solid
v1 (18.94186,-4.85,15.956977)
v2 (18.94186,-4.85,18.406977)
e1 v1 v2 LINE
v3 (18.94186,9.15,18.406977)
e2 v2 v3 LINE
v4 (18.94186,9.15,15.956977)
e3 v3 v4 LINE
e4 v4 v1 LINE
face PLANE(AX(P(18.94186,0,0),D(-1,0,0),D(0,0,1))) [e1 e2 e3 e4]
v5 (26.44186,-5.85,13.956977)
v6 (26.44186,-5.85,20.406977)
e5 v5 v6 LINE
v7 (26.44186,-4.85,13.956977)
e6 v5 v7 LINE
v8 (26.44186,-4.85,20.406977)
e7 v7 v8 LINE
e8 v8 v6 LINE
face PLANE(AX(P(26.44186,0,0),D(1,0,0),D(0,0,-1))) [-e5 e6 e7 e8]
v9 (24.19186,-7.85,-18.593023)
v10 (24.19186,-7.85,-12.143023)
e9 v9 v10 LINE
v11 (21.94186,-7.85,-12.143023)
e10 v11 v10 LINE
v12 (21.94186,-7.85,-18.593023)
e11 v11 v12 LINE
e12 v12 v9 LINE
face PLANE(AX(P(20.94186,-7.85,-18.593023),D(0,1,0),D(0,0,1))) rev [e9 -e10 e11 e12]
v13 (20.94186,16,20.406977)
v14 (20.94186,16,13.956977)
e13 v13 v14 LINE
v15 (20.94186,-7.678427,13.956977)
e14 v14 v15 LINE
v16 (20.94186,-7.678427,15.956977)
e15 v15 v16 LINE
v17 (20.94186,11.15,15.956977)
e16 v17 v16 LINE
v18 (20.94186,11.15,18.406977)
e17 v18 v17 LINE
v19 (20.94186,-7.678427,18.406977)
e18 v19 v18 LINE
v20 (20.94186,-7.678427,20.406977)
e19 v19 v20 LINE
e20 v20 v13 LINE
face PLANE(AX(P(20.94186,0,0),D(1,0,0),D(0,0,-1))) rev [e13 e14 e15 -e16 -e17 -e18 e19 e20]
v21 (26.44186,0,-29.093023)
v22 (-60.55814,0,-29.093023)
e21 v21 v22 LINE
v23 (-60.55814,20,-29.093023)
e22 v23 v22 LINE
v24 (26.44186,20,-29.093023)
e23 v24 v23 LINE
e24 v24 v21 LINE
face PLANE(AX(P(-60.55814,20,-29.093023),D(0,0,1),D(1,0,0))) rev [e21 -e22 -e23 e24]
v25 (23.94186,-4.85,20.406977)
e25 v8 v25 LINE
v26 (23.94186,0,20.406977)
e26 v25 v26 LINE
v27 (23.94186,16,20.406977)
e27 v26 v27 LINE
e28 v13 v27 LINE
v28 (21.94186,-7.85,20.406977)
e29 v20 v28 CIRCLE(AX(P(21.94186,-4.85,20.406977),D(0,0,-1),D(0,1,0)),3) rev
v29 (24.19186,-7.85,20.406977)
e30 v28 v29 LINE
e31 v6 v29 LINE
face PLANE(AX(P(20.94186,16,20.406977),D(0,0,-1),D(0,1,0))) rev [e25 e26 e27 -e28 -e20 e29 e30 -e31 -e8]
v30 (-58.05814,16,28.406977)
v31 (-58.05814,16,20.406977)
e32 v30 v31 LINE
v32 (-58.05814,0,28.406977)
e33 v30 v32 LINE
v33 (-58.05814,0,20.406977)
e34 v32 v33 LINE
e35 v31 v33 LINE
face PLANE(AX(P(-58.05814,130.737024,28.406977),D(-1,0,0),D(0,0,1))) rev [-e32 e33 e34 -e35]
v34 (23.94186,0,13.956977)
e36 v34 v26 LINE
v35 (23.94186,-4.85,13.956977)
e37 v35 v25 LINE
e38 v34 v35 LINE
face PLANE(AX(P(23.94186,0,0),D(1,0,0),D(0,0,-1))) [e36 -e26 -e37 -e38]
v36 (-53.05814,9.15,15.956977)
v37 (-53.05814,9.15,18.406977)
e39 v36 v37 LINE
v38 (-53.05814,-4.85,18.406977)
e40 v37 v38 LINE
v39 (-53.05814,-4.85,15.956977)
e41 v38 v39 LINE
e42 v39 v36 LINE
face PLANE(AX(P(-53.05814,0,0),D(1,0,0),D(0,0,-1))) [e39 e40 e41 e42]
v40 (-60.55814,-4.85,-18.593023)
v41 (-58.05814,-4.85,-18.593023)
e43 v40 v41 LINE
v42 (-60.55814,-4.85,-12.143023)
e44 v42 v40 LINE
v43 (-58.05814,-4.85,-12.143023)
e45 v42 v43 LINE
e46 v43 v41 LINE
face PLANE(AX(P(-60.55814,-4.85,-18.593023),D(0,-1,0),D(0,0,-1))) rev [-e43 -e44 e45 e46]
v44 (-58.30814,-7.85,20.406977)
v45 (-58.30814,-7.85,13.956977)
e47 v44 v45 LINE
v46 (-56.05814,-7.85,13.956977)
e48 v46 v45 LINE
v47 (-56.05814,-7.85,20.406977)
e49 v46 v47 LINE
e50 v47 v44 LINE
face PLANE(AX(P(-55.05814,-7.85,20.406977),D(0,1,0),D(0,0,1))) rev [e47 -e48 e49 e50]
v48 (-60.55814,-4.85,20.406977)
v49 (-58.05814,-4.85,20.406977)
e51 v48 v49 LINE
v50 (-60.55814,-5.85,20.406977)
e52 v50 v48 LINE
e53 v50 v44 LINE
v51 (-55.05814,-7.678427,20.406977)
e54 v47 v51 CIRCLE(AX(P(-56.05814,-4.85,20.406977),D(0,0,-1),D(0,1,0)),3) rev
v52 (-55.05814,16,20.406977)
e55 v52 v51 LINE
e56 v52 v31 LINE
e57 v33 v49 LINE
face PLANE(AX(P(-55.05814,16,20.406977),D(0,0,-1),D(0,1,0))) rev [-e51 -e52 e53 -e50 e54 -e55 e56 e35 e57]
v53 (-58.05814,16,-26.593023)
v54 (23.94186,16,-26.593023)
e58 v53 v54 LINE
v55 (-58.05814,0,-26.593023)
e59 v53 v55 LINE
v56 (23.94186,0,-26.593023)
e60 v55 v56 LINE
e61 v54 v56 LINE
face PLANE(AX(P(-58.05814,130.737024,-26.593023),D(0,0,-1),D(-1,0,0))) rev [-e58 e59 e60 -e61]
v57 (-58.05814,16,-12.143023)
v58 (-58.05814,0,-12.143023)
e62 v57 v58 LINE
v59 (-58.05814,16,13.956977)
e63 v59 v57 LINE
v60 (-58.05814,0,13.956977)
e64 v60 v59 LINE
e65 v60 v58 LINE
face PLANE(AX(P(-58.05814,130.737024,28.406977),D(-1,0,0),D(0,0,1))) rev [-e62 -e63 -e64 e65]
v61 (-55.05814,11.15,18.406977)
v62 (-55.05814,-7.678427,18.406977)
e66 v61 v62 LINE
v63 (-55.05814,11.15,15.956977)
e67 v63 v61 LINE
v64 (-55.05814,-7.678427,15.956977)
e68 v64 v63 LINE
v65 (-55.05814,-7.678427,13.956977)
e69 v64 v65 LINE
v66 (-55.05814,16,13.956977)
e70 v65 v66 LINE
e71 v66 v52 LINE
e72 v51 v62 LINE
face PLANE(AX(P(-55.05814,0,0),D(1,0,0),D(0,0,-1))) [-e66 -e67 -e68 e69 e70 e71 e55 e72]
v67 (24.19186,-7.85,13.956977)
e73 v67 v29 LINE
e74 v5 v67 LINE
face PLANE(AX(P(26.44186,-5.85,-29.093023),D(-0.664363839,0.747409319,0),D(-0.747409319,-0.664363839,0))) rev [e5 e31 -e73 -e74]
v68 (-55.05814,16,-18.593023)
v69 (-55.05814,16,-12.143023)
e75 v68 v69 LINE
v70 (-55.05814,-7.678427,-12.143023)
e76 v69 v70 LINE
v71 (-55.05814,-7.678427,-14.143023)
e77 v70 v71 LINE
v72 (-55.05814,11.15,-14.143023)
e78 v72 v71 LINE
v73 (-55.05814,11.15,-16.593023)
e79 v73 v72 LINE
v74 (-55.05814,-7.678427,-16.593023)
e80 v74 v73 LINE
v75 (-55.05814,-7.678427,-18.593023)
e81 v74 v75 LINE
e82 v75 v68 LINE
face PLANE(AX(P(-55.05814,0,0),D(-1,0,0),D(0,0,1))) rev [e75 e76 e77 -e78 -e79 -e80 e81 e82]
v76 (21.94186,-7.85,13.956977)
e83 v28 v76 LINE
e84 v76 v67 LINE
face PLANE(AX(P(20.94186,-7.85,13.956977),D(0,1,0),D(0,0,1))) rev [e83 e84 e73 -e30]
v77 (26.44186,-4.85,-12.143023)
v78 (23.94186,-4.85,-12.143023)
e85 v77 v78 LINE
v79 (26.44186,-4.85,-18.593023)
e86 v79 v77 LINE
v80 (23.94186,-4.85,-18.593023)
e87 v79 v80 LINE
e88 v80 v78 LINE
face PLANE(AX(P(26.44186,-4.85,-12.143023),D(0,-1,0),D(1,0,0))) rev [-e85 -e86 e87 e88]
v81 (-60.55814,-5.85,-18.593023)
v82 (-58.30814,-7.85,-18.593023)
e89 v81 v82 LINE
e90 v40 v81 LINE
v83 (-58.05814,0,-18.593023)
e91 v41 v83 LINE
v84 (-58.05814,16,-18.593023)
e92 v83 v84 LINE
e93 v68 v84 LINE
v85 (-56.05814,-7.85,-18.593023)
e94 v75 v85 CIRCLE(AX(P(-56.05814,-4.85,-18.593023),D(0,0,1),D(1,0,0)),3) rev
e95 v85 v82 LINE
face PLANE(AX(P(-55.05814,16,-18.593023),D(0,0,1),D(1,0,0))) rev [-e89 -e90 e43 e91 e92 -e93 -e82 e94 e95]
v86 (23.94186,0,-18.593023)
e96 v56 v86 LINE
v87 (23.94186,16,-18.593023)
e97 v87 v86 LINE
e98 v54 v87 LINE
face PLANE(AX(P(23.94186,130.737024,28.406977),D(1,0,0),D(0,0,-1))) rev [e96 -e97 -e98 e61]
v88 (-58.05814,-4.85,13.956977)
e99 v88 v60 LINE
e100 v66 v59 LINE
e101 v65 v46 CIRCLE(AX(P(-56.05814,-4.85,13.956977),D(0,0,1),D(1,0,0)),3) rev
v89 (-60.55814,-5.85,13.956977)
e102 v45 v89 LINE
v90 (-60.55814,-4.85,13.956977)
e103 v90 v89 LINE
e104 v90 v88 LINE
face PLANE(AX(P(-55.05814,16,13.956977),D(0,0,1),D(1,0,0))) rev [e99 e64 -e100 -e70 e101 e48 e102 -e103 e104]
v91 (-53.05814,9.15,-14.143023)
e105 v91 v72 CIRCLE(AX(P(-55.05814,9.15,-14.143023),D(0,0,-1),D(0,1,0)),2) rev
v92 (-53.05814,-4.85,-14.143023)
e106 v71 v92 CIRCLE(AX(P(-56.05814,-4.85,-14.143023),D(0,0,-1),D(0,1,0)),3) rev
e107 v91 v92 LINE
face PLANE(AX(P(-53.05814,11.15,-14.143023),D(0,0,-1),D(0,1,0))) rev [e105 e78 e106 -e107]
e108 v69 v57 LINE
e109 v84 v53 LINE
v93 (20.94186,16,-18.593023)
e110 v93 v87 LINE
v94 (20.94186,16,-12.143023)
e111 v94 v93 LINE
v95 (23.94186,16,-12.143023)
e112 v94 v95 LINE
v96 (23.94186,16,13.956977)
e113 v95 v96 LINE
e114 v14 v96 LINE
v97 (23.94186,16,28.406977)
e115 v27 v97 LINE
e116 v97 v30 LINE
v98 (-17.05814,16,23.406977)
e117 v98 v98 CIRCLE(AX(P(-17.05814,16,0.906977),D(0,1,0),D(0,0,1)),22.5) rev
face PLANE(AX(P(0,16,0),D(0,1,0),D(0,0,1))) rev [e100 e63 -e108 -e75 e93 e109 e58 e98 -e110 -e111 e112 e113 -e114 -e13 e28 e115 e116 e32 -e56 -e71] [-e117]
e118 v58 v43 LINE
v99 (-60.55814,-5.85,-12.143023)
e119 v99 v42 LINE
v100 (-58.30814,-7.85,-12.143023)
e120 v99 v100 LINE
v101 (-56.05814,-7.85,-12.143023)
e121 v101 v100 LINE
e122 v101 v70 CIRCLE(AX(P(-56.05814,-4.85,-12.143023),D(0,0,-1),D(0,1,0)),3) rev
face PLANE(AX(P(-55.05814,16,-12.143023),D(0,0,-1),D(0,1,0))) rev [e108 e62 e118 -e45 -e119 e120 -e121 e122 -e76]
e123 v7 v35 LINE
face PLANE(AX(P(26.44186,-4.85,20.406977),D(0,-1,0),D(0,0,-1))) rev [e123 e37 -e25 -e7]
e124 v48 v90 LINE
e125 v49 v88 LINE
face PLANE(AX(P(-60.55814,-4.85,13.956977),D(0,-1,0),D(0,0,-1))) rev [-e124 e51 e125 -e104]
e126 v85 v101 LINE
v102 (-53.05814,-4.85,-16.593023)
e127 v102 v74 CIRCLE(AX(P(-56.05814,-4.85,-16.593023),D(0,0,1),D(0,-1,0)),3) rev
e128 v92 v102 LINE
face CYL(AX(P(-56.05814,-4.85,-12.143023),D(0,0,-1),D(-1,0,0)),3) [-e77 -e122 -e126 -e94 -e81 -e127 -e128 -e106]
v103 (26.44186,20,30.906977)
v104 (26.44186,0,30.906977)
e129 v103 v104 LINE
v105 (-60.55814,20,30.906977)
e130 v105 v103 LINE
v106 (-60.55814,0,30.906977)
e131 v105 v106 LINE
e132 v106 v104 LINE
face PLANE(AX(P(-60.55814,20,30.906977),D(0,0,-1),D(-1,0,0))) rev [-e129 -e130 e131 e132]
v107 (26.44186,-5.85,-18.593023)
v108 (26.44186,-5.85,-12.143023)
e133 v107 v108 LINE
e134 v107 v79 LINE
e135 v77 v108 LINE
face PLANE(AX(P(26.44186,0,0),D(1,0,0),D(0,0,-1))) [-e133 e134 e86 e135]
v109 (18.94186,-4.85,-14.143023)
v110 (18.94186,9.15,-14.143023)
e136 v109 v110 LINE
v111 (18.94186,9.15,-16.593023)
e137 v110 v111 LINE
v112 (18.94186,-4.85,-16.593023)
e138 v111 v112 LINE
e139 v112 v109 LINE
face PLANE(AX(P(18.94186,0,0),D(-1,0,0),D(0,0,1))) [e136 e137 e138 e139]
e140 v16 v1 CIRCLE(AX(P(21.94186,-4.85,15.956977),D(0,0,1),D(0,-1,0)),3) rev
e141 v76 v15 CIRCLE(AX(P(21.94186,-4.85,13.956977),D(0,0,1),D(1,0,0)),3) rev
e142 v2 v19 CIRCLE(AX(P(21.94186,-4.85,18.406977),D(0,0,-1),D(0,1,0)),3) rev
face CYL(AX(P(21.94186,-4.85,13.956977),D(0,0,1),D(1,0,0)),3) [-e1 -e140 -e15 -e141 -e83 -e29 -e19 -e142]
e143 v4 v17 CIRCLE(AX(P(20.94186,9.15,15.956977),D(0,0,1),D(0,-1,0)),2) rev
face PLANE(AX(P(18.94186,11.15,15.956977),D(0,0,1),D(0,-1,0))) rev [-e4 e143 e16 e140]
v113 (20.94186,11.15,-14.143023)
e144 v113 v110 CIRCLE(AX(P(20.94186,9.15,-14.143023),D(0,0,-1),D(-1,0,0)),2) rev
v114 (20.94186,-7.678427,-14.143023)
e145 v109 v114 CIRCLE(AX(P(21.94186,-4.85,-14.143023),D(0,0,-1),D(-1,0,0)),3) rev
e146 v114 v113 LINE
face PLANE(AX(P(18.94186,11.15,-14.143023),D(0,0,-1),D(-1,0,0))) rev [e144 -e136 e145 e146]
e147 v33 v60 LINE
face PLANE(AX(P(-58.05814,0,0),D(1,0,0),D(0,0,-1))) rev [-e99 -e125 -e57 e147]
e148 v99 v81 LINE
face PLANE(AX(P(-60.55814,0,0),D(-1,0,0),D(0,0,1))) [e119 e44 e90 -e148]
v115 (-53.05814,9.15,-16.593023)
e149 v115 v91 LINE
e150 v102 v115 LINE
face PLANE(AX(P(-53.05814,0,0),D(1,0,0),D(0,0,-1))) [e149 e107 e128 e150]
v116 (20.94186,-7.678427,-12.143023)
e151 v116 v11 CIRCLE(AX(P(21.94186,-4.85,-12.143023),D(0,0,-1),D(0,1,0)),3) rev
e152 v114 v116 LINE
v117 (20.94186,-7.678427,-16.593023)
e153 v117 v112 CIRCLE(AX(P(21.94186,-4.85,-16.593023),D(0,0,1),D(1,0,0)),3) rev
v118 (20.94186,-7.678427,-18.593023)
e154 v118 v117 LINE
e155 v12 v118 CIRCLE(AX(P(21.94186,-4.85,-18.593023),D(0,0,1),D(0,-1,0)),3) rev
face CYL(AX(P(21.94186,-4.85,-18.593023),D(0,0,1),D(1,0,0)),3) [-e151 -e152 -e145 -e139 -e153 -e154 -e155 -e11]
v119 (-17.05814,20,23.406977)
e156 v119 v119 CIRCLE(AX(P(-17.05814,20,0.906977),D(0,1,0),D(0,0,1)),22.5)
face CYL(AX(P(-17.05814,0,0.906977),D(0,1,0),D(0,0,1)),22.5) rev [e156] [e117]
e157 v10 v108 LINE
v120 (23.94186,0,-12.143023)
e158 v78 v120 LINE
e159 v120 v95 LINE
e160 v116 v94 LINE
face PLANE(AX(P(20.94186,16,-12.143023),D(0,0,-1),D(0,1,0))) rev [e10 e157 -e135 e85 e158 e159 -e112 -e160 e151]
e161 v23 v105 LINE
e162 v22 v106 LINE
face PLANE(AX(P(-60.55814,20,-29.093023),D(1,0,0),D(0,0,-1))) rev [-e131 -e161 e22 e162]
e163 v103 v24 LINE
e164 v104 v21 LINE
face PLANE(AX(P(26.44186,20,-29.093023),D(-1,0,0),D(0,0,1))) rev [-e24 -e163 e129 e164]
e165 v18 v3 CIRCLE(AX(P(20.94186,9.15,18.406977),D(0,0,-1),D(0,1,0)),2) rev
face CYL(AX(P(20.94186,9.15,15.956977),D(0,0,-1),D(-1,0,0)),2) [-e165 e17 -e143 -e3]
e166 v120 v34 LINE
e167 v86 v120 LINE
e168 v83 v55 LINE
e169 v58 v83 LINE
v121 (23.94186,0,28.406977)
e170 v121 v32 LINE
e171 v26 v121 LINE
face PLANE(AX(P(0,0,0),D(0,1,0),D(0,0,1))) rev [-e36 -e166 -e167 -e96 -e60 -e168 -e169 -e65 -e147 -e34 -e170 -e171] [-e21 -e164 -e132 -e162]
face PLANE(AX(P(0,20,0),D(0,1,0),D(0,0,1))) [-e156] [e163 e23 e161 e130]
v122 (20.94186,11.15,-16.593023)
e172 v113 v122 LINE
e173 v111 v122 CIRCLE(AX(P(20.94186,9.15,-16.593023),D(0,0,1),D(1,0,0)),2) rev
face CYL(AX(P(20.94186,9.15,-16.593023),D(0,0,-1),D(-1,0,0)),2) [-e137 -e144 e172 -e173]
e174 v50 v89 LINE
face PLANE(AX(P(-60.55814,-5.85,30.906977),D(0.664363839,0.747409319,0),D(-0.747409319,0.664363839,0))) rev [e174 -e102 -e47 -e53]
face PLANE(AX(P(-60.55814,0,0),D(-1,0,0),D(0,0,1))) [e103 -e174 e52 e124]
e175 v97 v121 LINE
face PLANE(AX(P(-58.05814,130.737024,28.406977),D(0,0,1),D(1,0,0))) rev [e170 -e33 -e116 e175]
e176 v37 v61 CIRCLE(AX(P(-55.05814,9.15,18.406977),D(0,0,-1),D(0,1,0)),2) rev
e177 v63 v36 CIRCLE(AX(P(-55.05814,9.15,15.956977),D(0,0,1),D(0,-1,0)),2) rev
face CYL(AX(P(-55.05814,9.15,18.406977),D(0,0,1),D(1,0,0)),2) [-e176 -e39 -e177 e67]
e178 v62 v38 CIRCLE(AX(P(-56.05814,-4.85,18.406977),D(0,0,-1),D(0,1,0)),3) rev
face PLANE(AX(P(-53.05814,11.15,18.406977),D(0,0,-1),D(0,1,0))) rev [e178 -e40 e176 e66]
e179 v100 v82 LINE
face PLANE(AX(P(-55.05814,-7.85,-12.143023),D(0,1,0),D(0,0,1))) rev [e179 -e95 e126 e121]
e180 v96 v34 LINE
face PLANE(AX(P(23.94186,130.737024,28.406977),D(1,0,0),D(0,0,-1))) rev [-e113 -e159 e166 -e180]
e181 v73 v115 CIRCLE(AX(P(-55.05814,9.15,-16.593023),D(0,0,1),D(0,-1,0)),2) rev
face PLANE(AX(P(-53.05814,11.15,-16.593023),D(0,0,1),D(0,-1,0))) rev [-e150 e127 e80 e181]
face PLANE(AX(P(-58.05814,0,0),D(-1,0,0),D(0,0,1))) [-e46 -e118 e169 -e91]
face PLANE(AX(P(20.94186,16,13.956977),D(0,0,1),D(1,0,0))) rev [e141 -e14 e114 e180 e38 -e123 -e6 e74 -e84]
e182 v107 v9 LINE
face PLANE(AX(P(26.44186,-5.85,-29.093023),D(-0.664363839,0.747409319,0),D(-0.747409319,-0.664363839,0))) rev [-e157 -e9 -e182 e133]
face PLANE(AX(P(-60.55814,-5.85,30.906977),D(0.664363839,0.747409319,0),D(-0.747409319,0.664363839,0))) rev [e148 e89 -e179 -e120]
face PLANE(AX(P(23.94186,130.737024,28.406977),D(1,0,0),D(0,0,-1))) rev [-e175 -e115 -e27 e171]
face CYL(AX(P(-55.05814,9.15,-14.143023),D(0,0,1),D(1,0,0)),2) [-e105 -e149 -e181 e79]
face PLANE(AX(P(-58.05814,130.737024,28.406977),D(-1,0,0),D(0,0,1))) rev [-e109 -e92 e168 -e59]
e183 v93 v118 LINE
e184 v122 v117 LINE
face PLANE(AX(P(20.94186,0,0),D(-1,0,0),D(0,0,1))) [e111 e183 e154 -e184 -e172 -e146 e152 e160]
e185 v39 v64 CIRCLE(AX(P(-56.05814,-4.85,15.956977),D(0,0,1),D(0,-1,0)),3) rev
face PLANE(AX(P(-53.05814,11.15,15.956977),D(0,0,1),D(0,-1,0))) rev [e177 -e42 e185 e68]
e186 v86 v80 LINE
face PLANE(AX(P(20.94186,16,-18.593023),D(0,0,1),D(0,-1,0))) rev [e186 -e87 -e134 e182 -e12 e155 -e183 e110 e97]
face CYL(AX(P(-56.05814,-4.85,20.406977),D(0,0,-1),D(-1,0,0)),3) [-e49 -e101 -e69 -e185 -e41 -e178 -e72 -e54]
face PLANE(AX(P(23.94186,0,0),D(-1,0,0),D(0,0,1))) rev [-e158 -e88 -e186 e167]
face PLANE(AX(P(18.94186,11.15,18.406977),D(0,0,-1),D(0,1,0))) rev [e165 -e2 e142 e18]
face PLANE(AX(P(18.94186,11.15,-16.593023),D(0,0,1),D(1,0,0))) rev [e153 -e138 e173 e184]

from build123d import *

# Parameters (mm, degrees)
SKETCH1_W            = 87
SKETCH1_H            = 60
BOSS_EXTRUDE1_DEPTH  = 20
SKETCH2_R            = 22.5
CUT_EXTRUDE1_DEPTH   = 20
SKETCH3_W            = 82
SKETCH3_H            = 55
CUT_EXTRUDE2_DEPTH   = 16
SKETCH4_W            = 6.45
SKETCH4_H            = 23.85
BOSS_EXTRUDE2_DEPTH  = 3
SKETCH5_W            = 2.45
SKETCH5_H            = 19
BOSS_EXTRUDE3_DEPTH  = 2
FILLET5_R            = 3
FILLET7_R            = 2
SKETCH6_W            = 2.45
SKETCH6_H            = 19
BOSS_EXTRUDE4_DEPTH  = 2
FILLET8_R            = 3
FILLET9_R            = 2
SKETCH7_W            = 6.45
SKETCH7_H            = 3
BOSS_EXTRUDE5_DEPTH  = 2.5
SKETCH9_W            = 6.45
SKETCH9_H            = 3
BOSS_EXTRUDE6_DEPTH  = 2.5
CUT_EXTRUDE3_DEPTH   = 81.731271908
SKETCH46_W           = 6.45
SKETCH46_H           = 23.85
BOSS_EXTRUDE22_DEPTH = 3
SKETCH47_W           = 2.45
SKETCH47_H           = 19
BOSS_EXTRUDE23_DEPTH = 2
SKETCH48_W           = 2.45
SKETCH48_H           = 19
BOSS_EXTRUDE24_DEPTH = 2
FILLET11_R           = 3
FILLET12_R           = 3
FILLET13_R           = 2
FILLET14_R           = 2
SKETCH49_W           = 6.45
SKETCH49_H           = 3
BOSS_EXTRUDE25_DEPTH = 2.5
SKETCH50_W           = 6.45
SKETCH50_H           = 3
BOSS_EXTRUDE26_DEPTH = 2.5
CUT_EXTRUDE8_DEPTH   = 81.731271908


with BuildPart() as part:
    # Sketch1 → Boss-Extrude1 (new body)
    with BuildSketch(Plane(origin=(0, 0, 0), x_dir=(1, 0, 0), z_dir=(0, 1, 0))):
        with Locations((-17.058139535, -0.906976744)):
            Rectangle(SKETCH1_W, SKETCH1_H)
    extrude(amount=BOSS_EXTRUDE1_DEPTH)

    # Sketch2 → Cut-Extrude1 (cut)
    with BuildSketch(Plane(origin=(0, 20, 0), x_dir=(1, 0, 0), z_dir=(0, 1, 0))):
        with Locations(Location((-17.058139535, -0.906976744, 0), (0, 0, 270))):
            Circle(SKETCH2_R)
    extrude(amount=-CUT_EXTRUDE1_DEPTH, mode=Mode.SUBTRACT)

    # Sketch3 → Cut-Extrude2 (cut)
    with BuildSketch(Plane.XZ):
        with Locations((-17.058139535, 0.906976744)):
            Rectangle(SKETCH3_W, SKETCH3_H)
    extrude(amount=-CUT_EXTRUDE2_DEPTH, mode=Mode.SUBTRACT)

    # Sketch4 → Boss-Extrude2 (add)
    with BuildSketch(Plane.ZY.offset(-23.941860465)):
        with Locations((-15.368023256, 4.075)):
            Rectangle(SKETCH4_W, SKETCH4_H)
        with Locations((17.181976744, 4.075)):
            Rectangle(SKETCH4_W, SKETCH4_H)
    extrude(amount=BOSS_EXTRUDE2_DEPTH)

    # Sketch5 → Boss-Extrude3 (add)
    with BuildSketch(Plane.ZY.offset(-20.941860465)):
        with Locations((-15.368023256, 1.65)):
            Rectangle(SKETCH5_W, SKETCH5_H)
    extrude(amount=BOSS_EXTRUDE3_DEPTH)

    # Fillet5
    fillet5_edges = [part.edges().sort_by_distance(p)[0] for p in [
        (18.941860465, -7.85, -15.368023256),
    ]]
    fillet(fillet5_edges, radius=FILLET5_R)

    # Fillet7
    fillet7_edges = [part.edges().sort_by_distance(p)[0] for p in [
        (18.941860465, 11.15, -15.368023256),
    ]]
    fillet(fillet7_edges, radius=FILLET7_R - 0.0001)  # a hair under: the kernel refuses the full size

    # Sketch6 → Boss-Extrude4 (add)
    with BuildSketch(Plane.ZY.offset(-20.941860465)):
        with Locations((17.181976744, 1.65)):
            Rectangle(SKETCH6_W, SKETCH6_H)
    extrude(amount=BOSS_EXTRUDE4_DEPTH)

    # Fillet8
    fillet8_edges = [part.edges().sort_by_distance(p)[0] for p in [
        (18.941860465, -7.85, 17.181976744),
    ]]
    fillet(fillet8_edges, radius=FILLET8_R)

    # Fillet9
    fillet9_edges = [part.edges().sort_by_distance(p)[0] for p in [
        (18.941860465, 11.15, 17.181976744),
    ]]
    fillet(fillet9_edges, radius=FILLET9_R - 0.0001)  # a hair under: the kernel refuses the full size

    # Sketch7 → Boss-Extrude5 (add)
    with BuildSketch(Plane(origin=(23.941860465, 0, 0), x_dir=(0, 0, -1), z_dir=(1, 0, 0))):
        with Locations((-17.181976744, -6.35)):
            Rectangle(SKETCH7_W, SKETCH7_H)
    extrude(amount=BOSS_EXTRUDE5_DEPTH)

    # Sketch9 → Boss-Extrude6 (add)
    with BuildSketch(Plane(origin=(23.941860465, 0, 0), x_dir=(0, 0, -1), z_dir=(1, 0, 0))):
        with Locations((15.368023256, -6.35)):
            Rectangle(SKETCH9_W, SKETCH9_H)
    extrude(amount=BOSS_EXTRUDE6_DEPTH)

    # Sketch8 → Cut-Extrude3 (cut, through all)
    with BuildSketch(Plane.XY.offset(20.406976744)):
        Polygon((26.441860465, -5.85), (24.191860465, -7.85), (26.441860465, -7.85), align=None)
    extrude(amount=-CUT_EXTRUDE3_DEPTH, mode=Mode.SUBTRACT)

    # Sketch46 → Boss-Extrude22 (add)
    with BuildSketch(Plane(origin=(-58.058139535, 0, 0), x_dir=(0, 0, -1), z_dir=(1, 0, 0))):
        with Locations((-17.181976744, 4.075)):
            Rectangle(SKETCH46_W, SKETCH46_H)
        with Locations((15.368023256, 4.075)):
            Rectangle(SKETCH46_W, SKETCH46_H)
    extrude(amount=BOSS_EXTRUDE22_DEPTH)

    # Sketch47 → Boss-Extrude23 (add)
    with BuildSketch(Plane(origin=(-55.058139535, 0, 0), x_dir=(0, 0, -1), z_dir=(1, 0, 0))):
        with Locations((-17.181976744, 1.65)):
            Rectangle(SKETCH47_W, SKETCH47_H)
    extrude(amount=BOSS_EXTRUDE23_DEPTH)

    # Sketch48 → Boss-Extrude24 (add)
    with BuildSketch(Plane(origin=(-55.058139535, 0, 0), x_dir=(0, 0, -1), z_dir=(1, 0, 0))):
        with Locations((15.368023256, 1.65)):
            Rectangle(SKETCH48_W, SKETCH48_H)
    extrude(amount=BOSS_EXTRUDE24_DEPTH)

    # Fillet11
    fillet11_edges = [part.edges().sort_by_distance(p)[0] for p in [
        (-53.058139535, -7.85, 17.181976744),
    ]]
    fillet(fillet11_edges, radius=FILLET11_R)

    # Fillet12
    fillet12_edges = [part.edges().sort_by_distance(p)[0] for p in [
        (-53.058139535, -7.85, -15.368023256),
    ]]
    fillet(fillet12_edges, radius=FILLET12_R)

    # Fillet13
    fillet13_edges = [part.edges().sort_by_distance(p)[0] for p in [
        (-53.058139535, 11.15, -15.368023256),
    ]]
    fillet(fillet13_edges, radius=FILLET13_R - 0.0001)  # a hair under: the kernel refuses the full size

    # Fillet14
    fillet14_edges = [part.edges().sort_by_distance(p)[0] for p in [
        (-53.058139535, 11.15, 17.181976744),
    ]]
    fillet(fillet14_edges, radius=FILLET14_R - 0.0001)  # a hair under: the kernel refuses the full size

    # Sketch49 → Boss-Extrude25 (add)
    with BuildSketch(Plane.ZY.offset(58.058139535)):
        with Locations((17.181976744, -6.35)):
            Rectangle(SKETCH49_W, SKETCH49_H)
    extrude(amount=BOSS_EXTRUDE25_DEPTH)

    # Sketch50 → Boss-Extrude26 (add)
    with BuildSketch(Plane.ZY.offset(58.058139535)):
        with Locations((-15.368023256, -6.35)):
            Rectangle(SKETCH50_W, SKETCH50_H)
    extrude(amount=BOSS_EXTRUDE26_DEPTH)

    # Sketch52 → Cut-Extrude8 (cut, through all)
    with BuildSketch(Plane(origin=(0, 0, -18.593023256), x_dir=(-1, 0, 0), z_dir=(0, 0, -1))):
        Polygon((60.558139535, -5.85), (58.308139535, -7.85), (60.558139535, -7.85), align=None)
    extrude(amount=-CUT_EXTRUDE8_DEPTH, mode=Mode.SUBTRACT)


solid = part.part
